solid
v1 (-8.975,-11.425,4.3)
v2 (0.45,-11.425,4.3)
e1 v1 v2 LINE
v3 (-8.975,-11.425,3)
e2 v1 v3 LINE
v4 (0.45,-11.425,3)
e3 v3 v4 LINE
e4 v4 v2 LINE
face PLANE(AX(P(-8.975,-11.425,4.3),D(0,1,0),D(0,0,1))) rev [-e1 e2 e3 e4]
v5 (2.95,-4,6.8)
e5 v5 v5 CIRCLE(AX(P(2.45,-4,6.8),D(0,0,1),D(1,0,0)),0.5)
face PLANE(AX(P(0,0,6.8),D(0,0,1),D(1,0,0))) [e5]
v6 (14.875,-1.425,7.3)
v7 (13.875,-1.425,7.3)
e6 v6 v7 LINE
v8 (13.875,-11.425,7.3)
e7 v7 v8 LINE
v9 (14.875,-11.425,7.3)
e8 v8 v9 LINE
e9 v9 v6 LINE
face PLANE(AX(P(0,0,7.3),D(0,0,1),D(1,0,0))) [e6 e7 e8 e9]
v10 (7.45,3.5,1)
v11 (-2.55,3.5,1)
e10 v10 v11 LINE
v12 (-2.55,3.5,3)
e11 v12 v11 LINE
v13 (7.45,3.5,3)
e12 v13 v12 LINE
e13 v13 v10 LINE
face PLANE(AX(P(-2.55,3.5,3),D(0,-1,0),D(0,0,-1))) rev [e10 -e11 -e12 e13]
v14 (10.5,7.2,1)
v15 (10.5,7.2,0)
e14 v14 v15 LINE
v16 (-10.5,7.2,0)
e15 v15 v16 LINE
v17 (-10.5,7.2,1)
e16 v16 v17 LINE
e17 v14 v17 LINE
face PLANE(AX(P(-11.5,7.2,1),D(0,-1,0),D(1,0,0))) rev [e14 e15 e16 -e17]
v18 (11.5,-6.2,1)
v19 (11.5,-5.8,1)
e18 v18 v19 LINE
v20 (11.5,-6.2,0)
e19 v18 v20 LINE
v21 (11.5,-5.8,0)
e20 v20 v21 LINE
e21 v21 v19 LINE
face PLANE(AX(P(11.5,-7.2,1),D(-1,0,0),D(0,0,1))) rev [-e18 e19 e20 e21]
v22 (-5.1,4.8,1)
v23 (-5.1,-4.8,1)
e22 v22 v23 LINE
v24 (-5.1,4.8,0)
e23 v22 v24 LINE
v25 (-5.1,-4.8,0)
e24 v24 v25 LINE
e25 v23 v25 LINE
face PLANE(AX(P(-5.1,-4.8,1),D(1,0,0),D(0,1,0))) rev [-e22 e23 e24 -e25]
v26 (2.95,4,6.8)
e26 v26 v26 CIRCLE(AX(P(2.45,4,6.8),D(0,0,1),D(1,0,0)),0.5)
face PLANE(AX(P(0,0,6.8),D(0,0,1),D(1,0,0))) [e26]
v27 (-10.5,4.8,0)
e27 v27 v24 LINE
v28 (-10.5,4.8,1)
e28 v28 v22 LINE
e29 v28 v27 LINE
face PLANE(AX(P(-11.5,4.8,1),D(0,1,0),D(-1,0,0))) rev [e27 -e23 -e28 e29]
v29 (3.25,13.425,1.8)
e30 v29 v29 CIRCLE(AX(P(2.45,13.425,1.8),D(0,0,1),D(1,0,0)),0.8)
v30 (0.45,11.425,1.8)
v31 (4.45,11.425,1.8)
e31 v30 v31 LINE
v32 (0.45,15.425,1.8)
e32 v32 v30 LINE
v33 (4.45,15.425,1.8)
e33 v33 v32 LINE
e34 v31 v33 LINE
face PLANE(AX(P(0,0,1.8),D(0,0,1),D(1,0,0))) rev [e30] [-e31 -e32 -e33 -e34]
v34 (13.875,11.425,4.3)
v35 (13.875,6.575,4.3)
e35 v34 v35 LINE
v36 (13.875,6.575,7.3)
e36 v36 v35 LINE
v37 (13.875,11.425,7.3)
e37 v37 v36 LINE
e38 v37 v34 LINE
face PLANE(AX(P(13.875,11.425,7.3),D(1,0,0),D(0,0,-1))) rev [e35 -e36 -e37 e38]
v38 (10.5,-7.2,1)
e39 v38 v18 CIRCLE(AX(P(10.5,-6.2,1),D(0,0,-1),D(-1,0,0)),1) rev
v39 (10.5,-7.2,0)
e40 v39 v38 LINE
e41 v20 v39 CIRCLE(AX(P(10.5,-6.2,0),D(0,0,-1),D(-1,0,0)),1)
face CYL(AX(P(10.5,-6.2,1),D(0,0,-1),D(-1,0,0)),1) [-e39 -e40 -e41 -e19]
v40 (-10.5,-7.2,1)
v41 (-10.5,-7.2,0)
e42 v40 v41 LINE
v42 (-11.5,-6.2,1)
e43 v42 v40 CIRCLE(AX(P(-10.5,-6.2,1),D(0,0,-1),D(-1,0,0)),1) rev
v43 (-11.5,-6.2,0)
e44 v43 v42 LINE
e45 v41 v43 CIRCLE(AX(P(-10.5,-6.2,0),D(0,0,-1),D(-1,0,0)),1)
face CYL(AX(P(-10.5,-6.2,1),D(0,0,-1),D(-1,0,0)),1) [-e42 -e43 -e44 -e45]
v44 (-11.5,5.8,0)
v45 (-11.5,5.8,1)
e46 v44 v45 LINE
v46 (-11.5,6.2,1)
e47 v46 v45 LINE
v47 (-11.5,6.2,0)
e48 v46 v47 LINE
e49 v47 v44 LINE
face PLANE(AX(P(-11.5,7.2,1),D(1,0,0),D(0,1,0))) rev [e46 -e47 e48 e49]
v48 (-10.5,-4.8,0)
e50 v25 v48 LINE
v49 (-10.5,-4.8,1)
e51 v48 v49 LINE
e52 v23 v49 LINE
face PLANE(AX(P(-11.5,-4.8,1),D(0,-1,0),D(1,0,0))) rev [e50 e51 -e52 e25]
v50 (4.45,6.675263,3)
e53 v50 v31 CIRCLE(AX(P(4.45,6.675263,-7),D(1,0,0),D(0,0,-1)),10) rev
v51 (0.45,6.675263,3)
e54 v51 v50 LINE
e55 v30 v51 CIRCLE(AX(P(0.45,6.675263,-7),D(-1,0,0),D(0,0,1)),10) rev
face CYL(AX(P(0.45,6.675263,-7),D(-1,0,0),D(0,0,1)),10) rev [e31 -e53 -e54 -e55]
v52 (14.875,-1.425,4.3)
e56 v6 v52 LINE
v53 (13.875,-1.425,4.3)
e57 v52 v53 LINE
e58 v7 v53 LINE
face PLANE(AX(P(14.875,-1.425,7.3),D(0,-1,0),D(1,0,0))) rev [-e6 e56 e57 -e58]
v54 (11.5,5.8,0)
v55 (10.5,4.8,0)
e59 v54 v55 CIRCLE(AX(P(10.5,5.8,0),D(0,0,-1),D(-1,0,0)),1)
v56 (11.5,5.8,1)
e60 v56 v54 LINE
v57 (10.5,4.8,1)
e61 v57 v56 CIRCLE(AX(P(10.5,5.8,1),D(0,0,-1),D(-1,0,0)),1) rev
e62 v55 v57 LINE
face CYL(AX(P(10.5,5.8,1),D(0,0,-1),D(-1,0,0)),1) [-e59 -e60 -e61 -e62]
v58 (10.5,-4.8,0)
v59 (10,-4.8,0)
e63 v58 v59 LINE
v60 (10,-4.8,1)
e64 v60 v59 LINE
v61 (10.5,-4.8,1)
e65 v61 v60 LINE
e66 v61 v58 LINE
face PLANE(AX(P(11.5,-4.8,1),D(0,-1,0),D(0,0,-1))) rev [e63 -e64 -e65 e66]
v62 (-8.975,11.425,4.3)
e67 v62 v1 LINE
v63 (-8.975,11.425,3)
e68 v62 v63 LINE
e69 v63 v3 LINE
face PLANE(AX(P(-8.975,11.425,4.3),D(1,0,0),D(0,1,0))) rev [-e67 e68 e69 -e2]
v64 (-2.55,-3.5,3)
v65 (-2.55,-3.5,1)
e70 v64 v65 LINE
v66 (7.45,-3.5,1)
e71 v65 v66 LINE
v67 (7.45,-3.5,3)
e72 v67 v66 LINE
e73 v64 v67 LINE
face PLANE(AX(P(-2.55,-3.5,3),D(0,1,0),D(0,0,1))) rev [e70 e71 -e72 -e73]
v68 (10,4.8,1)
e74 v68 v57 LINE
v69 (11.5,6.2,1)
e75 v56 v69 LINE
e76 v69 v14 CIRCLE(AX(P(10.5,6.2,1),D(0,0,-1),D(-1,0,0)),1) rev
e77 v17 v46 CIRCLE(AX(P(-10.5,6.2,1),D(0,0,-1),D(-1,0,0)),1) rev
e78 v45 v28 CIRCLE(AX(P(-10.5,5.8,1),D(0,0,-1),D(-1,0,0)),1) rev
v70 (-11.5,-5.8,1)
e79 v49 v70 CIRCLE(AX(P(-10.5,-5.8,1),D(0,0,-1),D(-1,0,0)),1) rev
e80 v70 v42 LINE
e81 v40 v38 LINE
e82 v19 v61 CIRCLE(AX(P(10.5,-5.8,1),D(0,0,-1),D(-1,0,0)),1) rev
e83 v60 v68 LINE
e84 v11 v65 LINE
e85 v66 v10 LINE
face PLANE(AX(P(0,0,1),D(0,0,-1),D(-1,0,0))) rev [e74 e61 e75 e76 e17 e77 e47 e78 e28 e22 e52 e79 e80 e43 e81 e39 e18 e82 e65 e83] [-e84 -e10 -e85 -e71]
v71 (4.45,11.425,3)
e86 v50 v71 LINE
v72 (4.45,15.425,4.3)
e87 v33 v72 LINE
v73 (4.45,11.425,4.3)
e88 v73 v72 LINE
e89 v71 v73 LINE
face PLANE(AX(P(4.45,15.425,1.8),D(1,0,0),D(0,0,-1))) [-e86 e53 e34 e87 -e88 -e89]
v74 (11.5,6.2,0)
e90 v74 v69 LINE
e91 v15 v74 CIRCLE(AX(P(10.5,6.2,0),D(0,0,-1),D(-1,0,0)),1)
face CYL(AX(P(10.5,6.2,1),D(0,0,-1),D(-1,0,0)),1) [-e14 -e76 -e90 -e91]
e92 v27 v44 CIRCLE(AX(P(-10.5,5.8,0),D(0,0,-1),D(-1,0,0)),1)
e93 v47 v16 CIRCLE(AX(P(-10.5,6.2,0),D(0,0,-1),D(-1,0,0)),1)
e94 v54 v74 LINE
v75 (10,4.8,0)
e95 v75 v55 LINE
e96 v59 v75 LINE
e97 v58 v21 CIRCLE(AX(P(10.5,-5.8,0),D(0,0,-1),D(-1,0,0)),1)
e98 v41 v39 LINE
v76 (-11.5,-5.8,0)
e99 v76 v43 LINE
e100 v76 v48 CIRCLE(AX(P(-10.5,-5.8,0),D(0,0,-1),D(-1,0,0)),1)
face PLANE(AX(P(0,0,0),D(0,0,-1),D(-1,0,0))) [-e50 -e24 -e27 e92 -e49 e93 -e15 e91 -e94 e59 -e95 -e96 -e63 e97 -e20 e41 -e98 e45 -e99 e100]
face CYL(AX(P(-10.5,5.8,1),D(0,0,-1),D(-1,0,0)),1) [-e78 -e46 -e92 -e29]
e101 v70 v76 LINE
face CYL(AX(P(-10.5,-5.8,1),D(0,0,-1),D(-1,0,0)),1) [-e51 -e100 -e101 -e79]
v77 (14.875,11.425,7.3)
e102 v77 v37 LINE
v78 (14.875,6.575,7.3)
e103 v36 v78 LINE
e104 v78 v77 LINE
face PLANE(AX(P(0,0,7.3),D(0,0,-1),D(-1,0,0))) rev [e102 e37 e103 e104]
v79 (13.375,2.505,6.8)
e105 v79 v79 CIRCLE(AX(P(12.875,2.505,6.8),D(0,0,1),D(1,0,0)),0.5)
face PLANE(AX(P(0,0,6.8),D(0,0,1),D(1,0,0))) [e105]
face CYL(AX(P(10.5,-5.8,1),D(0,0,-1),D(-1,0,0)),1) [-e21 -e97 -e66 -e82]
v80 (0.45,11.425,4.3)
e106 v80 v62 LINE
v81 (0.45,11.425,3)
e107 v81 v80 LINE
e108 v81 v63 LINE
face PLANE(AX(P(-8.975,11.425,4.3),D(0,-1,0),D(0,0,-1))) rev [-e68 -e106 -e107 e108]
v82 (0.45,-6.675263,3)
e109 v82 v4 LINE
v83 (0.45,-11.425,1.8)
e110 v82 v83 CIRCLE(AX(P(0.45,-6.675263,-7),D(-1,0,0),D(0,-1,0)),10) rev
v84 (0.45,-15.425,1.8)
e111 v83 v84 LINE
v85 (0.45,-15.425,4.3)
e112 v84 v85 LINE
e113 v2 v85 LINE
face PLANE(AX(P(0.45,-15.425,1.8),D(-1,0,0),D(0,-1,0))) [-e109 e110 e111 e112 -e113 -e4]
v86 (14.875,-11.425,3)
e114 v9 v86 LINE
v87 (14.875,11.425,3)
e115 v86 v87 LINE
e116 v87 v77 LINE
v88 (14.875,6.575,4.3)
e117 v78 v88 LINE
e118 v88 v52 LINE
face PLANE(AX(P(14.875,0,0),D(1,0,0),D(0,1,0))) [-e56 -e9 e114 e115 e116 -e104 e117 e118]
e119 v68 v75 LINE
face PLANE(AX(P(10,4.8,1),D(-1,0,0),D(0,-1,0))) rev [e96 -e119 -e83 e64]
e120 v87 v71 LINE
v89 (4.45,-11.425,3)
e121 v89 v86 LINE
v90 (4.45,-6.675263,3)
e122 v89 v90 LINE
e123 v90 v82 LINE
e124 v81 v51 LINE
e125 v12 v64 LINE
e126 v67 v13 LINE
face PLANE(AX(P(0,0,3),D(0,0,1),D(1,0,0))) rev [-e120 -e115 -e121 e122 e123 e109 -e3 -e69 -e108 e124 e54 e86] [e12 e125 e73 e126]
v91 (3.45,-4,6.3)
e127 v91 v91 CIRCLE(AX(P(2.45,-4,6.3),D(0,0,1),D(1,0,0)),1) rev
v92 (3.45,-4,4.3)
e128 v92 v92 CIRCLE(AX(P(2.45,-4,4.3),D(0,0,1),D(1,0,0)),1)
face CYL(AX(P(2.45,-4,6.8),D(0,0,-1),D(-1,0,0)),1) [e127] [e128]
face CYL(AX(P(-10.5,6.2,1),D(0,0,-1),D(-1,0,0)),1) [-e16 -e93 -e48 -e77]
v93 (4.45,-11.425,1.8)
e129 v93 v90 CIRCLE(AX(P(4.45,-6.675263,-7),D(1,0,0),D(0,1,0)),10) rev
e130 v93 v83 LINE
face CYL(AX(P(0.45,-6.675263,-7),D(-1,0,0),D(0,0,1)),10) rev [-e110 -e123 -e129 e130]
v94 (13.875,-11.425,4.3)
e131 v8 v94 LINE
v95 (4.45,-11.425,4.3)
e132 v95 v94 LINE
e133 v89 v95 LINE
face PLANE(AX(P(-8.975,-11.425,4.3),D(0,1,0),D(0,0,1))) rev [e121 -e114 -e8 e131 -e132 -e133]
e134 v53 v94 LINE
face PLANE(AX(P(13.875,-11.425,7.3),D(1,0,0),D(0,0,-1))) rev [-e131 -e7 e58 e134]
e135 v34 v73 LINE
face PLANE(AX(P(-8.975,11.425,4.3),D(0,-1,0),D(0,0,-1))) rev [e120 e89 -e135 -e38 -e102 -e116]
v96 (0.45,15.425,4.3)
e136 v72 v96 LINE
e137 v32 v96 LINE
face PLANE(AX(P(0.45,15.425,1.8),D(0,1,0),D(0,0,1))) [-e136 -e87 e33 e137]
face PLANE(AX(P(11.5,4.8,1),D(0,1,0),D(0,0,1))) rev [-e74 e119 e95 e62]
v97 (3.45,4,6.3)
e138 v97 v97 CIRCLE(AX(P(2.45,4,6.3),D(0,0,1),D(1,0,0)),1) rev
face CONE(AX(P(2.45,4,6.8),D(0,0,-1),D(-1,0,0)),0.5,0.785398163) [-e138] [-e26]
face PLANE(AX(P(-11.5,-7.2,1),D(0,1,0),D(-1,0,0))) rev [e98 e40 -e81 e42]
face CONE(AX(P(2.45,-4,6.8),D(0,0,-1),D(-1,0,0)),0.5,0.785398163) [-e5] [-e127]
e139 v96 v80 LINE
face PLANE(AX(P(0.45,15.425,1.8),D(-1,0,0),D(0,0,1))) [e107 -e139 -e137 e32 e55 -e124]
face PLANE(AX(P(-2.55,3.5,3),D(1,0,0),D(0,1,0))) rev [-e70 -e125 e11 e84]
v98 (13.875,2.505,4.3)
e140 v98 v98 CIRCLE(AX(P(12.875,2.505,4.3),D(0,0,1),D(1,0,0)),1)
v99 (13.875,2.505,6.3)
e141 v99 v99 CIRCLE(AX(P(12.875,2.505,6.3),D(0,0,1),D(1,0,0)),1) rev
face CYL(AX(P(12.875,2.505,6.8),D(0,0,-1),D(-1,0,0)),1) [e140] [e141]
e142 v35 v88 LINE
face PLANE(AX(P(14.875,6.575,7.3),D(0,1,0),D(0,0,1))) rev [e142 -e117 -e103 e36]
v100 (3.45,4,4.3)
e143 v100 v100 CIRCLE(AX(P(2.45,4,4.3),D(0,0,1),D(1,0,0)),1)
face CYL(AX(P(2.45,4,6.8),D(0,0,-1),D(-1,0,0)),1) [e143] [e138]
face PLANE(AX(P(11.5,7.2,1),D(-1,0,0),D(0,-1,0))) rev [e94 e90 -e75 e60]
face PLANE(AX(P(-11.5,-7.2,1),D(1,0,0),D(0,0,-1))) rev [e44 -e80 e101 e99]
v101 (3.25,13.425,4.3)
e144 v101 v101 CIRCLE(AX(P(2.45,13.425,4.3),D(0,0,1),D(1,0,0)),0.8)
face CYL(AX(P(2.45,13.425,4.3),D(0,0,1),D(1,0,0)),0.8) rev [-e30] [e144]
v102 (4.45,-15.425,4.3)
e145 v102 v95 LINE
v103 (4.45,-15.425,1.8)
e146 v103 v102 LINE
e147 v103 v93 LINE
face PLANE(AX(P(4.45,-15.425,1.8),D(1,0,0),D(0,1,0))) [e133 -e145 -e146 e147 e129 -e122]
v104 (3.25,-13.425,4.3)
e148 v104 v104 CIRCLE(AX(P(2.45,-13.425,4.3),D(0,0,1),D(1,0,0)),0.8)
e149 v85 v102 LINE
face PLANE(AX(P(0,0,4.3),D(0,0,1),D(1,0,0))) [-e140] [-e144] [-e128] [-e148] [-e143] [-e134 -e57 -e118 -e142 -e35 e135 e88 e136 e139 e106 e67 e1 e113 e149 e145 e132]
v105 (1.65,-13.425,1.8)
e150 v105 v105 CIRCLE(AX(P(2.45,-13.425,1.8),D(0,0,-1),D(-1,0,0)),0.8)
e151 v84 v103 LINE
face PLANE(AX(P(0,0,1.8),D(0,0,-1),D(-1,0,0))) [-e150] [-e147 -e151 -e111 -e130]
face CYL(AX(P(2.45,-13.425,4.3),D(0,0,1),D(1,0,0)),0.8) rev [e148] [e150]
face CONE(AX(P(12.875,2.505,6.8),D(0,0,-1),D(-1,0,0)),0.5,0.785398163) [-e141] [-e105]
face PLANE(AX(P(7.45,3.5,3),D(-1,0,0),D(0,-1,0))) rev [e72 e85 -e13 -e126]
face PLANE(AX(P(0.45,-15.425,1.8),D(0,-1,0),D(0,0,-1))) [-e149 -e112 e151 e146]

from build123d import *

# Parameters (mm, degrees)
BOSS_EXTRUDE1_DEPTH     = 1
FILLET2_R               = 1
SKETCH3_W               = 10
SKETCH3_H               = 7
BOSS_EXTRUDE2_DEPTH     = 2
SKETCH4_W               = 22.85
SKETCH4_H               = 22.85
BOSS_EXTRUDE3_DEPTH     = 1.3
SKETCH7_W               = 4
SKETCH7_H               = 4
BOSS_EXTRUDE4_DEPTH     = 2.5
FILLET3_R               = 10
FILLET4_R               = 10
TAP_DRILL_FOR_M2_TAP1_D = 1.6
SKETCH11_W              = 22.85
SKETCH11_H              = 1.3
BOSS_EXTRUDE5_DEPTH     = 1
SKETCH12_W              = 1
SKETCH12_H              = 10
SKETCH12_H_2            = 4.85
BOSS_EXTRUDE6_DEPTH     = 3
SKETCH13_R              = 1
BOSS_EXTRUDE7_DEPTH     = 2.5
CHAMFER2_SIZE           = 0.5


with BuildPart() as part:
    # Sketch2 → Boss-Extrude1 (new body)
    with BuildSketch(Plane(origin=(0, 0, 0), x_dir=(0, 1, 0), z_dir=(0, 0, 1))):
        Polygon((-7.2, 11.5), (-7.2, -11.5), (-4.8, -11.5), (-4.8, -10), (4.8, -10), (4.8, -11.5), (7.2, -11.5), (7.2, 11.5), (4.8, 11.5), (4.8, 5.1), (-4.8, 5.1), (-4.8, 11.5), align=None)
    extrude(amount=BOSS_EXTRUDE1_DEPTH)

    # Fillet2
    fillet2_edges = [part.edges().sort_by_distance(p)[0] for p in [
        (11.5, 7.2, 0.5),
        (11.5, 4.8, 0.5),
        (11.5, -4.8, 0.5),
        (11.5, -7.2, 0.5),
        (-11.5, -7.2, 0.5),
        (-11.5, -4.8, 0.5),
        (-11.5, 4.8, 0.5),
        (-11.5, 7.2, 0.5),
    ]]
    fillet(fillet2_edges, radius=FILLET2_R)

    # Sketch3 → Boss-Extrude2 (add)
    with BuildSketch(Plane.XY.offset(1)):
        with Locations((2.45, 0)):
            Rectangle(SKETCH3_W, SKETCH3_H)
    extrude(amount=BOSS_EXTRUDE2_DEPTH)

    # Sketch4 → Boss-Extrude3 (add)
    with BuildSketch(Plane.XY.offset(3)):
        with Locations((2.45, 0)):
            Rectangle(SKETCH4_W, SKETCH4_H)
    extrude(amount=BOSS_EXTRUDE3_DEPTH)

    # Sketch7 → Boss-Extrude4 (add)
    with BuildSketch(Plane.XY.offset(4.3)):
        with Locations((2.45, 13.425)):
            Rectangle(SKETCH7_W, SKETCH7_H)
        with Locations((2.45, -13.425)):
            Rectangle(SKETCH7_W, SKETCH7_H)
    extrude(amount=-BOSS_EXTRUDE4_DEPTH)

    # Fillet3
    # the kernel refuses this fillet: 10 mm, written as the material it adds along each edge
    with BuildSketch(Plane(origin=(0.45, 11.425, 3), x_dir=(0, -1, 0), z_dir=(1, 0, 0))) as fillet3_piece_1:
        with BuildLine():
            CenterArc((4.749736835, 10), FILLET3_R, 241.642363424, 28.357636576)
            Line((0, 1.2), (0, 0))
            Line((0, 0), (4.749736835, 0))
        make_face()
    extrude(amount=4)

    # Fillet4
    # the kernel refuses this fillet: 10 mm, written as the material it adds along each edge
    with BuildSketch(Plane(origin=(4.45, -11.425, 3), x_dir=(0, 1, 0), z_dir=(-1, 0, 0))) as fillet4_piece_1:
        with BuildLine():
            CenterArc((4.749736835, 10), FILLET4_R, 241.642363424, 28.357636576)
            Line((0, 1.2), (0, 0))
            Line((0, 0), (4.749736835, 0))
        make_face()
    extrude(amount=4)

    # Tap Drill for M2 Tap1 (through all)
    with Locations(Plane.XY.offset(4.3)):
        with Locations((2.45, 13.425), (2.45, -13.425)):
            Hole(TAP_DRILL_FOR_M2_TAP1_D / 2)

    # Sketch11 → Boss-Extrude5 (add)
    with BuildSketch(Plane.YZ.offset(13.875)):
        with Locations((0, 3.65)):
            Rectangle(SKETCH11_W, SKETCH11_H)
    extrude(amount=BOSS_EXTRUDE5_DEPTH)

    # Sketch12 → Boss-Extrude6 (add)
    with BuildSketch(Plane.XY.offset(4.3)):
        with Locations((14.375, -6.425)):
            Rectangle(SKETCH12_W, SKETCH12_H)
        with Locations((14.375, 9)):
            Rectangle(SKETCH12_W, SKETCH12_H_2)
    extrude(amount=BOSS_EXTRUDE6_DEPTH)

    # Sketch13 → Boss-Extrude7 (add)
    with BuildSketch(Plane.XY.offset(4.3)):
        with Locations((12.875, 2.505)):
            Circle(SKETCH13_R)
        with Locations((2.45, 4)):
            Circle(SKETCH13_R)
        with Locations((2.45, -4)):
            Circle(SKETCH13_R)
    extrude(amount=BOSS_EXTRUDE7_DEPTH)

    # Chamfer2
    chamfer2_edges = [part.edges().sort_by_distance(p)[0] for p in [
        (11.875, 2.505, 6.8),
        (1.45, -4, 6.8),
        (1.45, 4, 6.8),
    ]]
    chamfer(chamfer2_edges, length=CHAMFER2_SIZE)


solid = part.part
